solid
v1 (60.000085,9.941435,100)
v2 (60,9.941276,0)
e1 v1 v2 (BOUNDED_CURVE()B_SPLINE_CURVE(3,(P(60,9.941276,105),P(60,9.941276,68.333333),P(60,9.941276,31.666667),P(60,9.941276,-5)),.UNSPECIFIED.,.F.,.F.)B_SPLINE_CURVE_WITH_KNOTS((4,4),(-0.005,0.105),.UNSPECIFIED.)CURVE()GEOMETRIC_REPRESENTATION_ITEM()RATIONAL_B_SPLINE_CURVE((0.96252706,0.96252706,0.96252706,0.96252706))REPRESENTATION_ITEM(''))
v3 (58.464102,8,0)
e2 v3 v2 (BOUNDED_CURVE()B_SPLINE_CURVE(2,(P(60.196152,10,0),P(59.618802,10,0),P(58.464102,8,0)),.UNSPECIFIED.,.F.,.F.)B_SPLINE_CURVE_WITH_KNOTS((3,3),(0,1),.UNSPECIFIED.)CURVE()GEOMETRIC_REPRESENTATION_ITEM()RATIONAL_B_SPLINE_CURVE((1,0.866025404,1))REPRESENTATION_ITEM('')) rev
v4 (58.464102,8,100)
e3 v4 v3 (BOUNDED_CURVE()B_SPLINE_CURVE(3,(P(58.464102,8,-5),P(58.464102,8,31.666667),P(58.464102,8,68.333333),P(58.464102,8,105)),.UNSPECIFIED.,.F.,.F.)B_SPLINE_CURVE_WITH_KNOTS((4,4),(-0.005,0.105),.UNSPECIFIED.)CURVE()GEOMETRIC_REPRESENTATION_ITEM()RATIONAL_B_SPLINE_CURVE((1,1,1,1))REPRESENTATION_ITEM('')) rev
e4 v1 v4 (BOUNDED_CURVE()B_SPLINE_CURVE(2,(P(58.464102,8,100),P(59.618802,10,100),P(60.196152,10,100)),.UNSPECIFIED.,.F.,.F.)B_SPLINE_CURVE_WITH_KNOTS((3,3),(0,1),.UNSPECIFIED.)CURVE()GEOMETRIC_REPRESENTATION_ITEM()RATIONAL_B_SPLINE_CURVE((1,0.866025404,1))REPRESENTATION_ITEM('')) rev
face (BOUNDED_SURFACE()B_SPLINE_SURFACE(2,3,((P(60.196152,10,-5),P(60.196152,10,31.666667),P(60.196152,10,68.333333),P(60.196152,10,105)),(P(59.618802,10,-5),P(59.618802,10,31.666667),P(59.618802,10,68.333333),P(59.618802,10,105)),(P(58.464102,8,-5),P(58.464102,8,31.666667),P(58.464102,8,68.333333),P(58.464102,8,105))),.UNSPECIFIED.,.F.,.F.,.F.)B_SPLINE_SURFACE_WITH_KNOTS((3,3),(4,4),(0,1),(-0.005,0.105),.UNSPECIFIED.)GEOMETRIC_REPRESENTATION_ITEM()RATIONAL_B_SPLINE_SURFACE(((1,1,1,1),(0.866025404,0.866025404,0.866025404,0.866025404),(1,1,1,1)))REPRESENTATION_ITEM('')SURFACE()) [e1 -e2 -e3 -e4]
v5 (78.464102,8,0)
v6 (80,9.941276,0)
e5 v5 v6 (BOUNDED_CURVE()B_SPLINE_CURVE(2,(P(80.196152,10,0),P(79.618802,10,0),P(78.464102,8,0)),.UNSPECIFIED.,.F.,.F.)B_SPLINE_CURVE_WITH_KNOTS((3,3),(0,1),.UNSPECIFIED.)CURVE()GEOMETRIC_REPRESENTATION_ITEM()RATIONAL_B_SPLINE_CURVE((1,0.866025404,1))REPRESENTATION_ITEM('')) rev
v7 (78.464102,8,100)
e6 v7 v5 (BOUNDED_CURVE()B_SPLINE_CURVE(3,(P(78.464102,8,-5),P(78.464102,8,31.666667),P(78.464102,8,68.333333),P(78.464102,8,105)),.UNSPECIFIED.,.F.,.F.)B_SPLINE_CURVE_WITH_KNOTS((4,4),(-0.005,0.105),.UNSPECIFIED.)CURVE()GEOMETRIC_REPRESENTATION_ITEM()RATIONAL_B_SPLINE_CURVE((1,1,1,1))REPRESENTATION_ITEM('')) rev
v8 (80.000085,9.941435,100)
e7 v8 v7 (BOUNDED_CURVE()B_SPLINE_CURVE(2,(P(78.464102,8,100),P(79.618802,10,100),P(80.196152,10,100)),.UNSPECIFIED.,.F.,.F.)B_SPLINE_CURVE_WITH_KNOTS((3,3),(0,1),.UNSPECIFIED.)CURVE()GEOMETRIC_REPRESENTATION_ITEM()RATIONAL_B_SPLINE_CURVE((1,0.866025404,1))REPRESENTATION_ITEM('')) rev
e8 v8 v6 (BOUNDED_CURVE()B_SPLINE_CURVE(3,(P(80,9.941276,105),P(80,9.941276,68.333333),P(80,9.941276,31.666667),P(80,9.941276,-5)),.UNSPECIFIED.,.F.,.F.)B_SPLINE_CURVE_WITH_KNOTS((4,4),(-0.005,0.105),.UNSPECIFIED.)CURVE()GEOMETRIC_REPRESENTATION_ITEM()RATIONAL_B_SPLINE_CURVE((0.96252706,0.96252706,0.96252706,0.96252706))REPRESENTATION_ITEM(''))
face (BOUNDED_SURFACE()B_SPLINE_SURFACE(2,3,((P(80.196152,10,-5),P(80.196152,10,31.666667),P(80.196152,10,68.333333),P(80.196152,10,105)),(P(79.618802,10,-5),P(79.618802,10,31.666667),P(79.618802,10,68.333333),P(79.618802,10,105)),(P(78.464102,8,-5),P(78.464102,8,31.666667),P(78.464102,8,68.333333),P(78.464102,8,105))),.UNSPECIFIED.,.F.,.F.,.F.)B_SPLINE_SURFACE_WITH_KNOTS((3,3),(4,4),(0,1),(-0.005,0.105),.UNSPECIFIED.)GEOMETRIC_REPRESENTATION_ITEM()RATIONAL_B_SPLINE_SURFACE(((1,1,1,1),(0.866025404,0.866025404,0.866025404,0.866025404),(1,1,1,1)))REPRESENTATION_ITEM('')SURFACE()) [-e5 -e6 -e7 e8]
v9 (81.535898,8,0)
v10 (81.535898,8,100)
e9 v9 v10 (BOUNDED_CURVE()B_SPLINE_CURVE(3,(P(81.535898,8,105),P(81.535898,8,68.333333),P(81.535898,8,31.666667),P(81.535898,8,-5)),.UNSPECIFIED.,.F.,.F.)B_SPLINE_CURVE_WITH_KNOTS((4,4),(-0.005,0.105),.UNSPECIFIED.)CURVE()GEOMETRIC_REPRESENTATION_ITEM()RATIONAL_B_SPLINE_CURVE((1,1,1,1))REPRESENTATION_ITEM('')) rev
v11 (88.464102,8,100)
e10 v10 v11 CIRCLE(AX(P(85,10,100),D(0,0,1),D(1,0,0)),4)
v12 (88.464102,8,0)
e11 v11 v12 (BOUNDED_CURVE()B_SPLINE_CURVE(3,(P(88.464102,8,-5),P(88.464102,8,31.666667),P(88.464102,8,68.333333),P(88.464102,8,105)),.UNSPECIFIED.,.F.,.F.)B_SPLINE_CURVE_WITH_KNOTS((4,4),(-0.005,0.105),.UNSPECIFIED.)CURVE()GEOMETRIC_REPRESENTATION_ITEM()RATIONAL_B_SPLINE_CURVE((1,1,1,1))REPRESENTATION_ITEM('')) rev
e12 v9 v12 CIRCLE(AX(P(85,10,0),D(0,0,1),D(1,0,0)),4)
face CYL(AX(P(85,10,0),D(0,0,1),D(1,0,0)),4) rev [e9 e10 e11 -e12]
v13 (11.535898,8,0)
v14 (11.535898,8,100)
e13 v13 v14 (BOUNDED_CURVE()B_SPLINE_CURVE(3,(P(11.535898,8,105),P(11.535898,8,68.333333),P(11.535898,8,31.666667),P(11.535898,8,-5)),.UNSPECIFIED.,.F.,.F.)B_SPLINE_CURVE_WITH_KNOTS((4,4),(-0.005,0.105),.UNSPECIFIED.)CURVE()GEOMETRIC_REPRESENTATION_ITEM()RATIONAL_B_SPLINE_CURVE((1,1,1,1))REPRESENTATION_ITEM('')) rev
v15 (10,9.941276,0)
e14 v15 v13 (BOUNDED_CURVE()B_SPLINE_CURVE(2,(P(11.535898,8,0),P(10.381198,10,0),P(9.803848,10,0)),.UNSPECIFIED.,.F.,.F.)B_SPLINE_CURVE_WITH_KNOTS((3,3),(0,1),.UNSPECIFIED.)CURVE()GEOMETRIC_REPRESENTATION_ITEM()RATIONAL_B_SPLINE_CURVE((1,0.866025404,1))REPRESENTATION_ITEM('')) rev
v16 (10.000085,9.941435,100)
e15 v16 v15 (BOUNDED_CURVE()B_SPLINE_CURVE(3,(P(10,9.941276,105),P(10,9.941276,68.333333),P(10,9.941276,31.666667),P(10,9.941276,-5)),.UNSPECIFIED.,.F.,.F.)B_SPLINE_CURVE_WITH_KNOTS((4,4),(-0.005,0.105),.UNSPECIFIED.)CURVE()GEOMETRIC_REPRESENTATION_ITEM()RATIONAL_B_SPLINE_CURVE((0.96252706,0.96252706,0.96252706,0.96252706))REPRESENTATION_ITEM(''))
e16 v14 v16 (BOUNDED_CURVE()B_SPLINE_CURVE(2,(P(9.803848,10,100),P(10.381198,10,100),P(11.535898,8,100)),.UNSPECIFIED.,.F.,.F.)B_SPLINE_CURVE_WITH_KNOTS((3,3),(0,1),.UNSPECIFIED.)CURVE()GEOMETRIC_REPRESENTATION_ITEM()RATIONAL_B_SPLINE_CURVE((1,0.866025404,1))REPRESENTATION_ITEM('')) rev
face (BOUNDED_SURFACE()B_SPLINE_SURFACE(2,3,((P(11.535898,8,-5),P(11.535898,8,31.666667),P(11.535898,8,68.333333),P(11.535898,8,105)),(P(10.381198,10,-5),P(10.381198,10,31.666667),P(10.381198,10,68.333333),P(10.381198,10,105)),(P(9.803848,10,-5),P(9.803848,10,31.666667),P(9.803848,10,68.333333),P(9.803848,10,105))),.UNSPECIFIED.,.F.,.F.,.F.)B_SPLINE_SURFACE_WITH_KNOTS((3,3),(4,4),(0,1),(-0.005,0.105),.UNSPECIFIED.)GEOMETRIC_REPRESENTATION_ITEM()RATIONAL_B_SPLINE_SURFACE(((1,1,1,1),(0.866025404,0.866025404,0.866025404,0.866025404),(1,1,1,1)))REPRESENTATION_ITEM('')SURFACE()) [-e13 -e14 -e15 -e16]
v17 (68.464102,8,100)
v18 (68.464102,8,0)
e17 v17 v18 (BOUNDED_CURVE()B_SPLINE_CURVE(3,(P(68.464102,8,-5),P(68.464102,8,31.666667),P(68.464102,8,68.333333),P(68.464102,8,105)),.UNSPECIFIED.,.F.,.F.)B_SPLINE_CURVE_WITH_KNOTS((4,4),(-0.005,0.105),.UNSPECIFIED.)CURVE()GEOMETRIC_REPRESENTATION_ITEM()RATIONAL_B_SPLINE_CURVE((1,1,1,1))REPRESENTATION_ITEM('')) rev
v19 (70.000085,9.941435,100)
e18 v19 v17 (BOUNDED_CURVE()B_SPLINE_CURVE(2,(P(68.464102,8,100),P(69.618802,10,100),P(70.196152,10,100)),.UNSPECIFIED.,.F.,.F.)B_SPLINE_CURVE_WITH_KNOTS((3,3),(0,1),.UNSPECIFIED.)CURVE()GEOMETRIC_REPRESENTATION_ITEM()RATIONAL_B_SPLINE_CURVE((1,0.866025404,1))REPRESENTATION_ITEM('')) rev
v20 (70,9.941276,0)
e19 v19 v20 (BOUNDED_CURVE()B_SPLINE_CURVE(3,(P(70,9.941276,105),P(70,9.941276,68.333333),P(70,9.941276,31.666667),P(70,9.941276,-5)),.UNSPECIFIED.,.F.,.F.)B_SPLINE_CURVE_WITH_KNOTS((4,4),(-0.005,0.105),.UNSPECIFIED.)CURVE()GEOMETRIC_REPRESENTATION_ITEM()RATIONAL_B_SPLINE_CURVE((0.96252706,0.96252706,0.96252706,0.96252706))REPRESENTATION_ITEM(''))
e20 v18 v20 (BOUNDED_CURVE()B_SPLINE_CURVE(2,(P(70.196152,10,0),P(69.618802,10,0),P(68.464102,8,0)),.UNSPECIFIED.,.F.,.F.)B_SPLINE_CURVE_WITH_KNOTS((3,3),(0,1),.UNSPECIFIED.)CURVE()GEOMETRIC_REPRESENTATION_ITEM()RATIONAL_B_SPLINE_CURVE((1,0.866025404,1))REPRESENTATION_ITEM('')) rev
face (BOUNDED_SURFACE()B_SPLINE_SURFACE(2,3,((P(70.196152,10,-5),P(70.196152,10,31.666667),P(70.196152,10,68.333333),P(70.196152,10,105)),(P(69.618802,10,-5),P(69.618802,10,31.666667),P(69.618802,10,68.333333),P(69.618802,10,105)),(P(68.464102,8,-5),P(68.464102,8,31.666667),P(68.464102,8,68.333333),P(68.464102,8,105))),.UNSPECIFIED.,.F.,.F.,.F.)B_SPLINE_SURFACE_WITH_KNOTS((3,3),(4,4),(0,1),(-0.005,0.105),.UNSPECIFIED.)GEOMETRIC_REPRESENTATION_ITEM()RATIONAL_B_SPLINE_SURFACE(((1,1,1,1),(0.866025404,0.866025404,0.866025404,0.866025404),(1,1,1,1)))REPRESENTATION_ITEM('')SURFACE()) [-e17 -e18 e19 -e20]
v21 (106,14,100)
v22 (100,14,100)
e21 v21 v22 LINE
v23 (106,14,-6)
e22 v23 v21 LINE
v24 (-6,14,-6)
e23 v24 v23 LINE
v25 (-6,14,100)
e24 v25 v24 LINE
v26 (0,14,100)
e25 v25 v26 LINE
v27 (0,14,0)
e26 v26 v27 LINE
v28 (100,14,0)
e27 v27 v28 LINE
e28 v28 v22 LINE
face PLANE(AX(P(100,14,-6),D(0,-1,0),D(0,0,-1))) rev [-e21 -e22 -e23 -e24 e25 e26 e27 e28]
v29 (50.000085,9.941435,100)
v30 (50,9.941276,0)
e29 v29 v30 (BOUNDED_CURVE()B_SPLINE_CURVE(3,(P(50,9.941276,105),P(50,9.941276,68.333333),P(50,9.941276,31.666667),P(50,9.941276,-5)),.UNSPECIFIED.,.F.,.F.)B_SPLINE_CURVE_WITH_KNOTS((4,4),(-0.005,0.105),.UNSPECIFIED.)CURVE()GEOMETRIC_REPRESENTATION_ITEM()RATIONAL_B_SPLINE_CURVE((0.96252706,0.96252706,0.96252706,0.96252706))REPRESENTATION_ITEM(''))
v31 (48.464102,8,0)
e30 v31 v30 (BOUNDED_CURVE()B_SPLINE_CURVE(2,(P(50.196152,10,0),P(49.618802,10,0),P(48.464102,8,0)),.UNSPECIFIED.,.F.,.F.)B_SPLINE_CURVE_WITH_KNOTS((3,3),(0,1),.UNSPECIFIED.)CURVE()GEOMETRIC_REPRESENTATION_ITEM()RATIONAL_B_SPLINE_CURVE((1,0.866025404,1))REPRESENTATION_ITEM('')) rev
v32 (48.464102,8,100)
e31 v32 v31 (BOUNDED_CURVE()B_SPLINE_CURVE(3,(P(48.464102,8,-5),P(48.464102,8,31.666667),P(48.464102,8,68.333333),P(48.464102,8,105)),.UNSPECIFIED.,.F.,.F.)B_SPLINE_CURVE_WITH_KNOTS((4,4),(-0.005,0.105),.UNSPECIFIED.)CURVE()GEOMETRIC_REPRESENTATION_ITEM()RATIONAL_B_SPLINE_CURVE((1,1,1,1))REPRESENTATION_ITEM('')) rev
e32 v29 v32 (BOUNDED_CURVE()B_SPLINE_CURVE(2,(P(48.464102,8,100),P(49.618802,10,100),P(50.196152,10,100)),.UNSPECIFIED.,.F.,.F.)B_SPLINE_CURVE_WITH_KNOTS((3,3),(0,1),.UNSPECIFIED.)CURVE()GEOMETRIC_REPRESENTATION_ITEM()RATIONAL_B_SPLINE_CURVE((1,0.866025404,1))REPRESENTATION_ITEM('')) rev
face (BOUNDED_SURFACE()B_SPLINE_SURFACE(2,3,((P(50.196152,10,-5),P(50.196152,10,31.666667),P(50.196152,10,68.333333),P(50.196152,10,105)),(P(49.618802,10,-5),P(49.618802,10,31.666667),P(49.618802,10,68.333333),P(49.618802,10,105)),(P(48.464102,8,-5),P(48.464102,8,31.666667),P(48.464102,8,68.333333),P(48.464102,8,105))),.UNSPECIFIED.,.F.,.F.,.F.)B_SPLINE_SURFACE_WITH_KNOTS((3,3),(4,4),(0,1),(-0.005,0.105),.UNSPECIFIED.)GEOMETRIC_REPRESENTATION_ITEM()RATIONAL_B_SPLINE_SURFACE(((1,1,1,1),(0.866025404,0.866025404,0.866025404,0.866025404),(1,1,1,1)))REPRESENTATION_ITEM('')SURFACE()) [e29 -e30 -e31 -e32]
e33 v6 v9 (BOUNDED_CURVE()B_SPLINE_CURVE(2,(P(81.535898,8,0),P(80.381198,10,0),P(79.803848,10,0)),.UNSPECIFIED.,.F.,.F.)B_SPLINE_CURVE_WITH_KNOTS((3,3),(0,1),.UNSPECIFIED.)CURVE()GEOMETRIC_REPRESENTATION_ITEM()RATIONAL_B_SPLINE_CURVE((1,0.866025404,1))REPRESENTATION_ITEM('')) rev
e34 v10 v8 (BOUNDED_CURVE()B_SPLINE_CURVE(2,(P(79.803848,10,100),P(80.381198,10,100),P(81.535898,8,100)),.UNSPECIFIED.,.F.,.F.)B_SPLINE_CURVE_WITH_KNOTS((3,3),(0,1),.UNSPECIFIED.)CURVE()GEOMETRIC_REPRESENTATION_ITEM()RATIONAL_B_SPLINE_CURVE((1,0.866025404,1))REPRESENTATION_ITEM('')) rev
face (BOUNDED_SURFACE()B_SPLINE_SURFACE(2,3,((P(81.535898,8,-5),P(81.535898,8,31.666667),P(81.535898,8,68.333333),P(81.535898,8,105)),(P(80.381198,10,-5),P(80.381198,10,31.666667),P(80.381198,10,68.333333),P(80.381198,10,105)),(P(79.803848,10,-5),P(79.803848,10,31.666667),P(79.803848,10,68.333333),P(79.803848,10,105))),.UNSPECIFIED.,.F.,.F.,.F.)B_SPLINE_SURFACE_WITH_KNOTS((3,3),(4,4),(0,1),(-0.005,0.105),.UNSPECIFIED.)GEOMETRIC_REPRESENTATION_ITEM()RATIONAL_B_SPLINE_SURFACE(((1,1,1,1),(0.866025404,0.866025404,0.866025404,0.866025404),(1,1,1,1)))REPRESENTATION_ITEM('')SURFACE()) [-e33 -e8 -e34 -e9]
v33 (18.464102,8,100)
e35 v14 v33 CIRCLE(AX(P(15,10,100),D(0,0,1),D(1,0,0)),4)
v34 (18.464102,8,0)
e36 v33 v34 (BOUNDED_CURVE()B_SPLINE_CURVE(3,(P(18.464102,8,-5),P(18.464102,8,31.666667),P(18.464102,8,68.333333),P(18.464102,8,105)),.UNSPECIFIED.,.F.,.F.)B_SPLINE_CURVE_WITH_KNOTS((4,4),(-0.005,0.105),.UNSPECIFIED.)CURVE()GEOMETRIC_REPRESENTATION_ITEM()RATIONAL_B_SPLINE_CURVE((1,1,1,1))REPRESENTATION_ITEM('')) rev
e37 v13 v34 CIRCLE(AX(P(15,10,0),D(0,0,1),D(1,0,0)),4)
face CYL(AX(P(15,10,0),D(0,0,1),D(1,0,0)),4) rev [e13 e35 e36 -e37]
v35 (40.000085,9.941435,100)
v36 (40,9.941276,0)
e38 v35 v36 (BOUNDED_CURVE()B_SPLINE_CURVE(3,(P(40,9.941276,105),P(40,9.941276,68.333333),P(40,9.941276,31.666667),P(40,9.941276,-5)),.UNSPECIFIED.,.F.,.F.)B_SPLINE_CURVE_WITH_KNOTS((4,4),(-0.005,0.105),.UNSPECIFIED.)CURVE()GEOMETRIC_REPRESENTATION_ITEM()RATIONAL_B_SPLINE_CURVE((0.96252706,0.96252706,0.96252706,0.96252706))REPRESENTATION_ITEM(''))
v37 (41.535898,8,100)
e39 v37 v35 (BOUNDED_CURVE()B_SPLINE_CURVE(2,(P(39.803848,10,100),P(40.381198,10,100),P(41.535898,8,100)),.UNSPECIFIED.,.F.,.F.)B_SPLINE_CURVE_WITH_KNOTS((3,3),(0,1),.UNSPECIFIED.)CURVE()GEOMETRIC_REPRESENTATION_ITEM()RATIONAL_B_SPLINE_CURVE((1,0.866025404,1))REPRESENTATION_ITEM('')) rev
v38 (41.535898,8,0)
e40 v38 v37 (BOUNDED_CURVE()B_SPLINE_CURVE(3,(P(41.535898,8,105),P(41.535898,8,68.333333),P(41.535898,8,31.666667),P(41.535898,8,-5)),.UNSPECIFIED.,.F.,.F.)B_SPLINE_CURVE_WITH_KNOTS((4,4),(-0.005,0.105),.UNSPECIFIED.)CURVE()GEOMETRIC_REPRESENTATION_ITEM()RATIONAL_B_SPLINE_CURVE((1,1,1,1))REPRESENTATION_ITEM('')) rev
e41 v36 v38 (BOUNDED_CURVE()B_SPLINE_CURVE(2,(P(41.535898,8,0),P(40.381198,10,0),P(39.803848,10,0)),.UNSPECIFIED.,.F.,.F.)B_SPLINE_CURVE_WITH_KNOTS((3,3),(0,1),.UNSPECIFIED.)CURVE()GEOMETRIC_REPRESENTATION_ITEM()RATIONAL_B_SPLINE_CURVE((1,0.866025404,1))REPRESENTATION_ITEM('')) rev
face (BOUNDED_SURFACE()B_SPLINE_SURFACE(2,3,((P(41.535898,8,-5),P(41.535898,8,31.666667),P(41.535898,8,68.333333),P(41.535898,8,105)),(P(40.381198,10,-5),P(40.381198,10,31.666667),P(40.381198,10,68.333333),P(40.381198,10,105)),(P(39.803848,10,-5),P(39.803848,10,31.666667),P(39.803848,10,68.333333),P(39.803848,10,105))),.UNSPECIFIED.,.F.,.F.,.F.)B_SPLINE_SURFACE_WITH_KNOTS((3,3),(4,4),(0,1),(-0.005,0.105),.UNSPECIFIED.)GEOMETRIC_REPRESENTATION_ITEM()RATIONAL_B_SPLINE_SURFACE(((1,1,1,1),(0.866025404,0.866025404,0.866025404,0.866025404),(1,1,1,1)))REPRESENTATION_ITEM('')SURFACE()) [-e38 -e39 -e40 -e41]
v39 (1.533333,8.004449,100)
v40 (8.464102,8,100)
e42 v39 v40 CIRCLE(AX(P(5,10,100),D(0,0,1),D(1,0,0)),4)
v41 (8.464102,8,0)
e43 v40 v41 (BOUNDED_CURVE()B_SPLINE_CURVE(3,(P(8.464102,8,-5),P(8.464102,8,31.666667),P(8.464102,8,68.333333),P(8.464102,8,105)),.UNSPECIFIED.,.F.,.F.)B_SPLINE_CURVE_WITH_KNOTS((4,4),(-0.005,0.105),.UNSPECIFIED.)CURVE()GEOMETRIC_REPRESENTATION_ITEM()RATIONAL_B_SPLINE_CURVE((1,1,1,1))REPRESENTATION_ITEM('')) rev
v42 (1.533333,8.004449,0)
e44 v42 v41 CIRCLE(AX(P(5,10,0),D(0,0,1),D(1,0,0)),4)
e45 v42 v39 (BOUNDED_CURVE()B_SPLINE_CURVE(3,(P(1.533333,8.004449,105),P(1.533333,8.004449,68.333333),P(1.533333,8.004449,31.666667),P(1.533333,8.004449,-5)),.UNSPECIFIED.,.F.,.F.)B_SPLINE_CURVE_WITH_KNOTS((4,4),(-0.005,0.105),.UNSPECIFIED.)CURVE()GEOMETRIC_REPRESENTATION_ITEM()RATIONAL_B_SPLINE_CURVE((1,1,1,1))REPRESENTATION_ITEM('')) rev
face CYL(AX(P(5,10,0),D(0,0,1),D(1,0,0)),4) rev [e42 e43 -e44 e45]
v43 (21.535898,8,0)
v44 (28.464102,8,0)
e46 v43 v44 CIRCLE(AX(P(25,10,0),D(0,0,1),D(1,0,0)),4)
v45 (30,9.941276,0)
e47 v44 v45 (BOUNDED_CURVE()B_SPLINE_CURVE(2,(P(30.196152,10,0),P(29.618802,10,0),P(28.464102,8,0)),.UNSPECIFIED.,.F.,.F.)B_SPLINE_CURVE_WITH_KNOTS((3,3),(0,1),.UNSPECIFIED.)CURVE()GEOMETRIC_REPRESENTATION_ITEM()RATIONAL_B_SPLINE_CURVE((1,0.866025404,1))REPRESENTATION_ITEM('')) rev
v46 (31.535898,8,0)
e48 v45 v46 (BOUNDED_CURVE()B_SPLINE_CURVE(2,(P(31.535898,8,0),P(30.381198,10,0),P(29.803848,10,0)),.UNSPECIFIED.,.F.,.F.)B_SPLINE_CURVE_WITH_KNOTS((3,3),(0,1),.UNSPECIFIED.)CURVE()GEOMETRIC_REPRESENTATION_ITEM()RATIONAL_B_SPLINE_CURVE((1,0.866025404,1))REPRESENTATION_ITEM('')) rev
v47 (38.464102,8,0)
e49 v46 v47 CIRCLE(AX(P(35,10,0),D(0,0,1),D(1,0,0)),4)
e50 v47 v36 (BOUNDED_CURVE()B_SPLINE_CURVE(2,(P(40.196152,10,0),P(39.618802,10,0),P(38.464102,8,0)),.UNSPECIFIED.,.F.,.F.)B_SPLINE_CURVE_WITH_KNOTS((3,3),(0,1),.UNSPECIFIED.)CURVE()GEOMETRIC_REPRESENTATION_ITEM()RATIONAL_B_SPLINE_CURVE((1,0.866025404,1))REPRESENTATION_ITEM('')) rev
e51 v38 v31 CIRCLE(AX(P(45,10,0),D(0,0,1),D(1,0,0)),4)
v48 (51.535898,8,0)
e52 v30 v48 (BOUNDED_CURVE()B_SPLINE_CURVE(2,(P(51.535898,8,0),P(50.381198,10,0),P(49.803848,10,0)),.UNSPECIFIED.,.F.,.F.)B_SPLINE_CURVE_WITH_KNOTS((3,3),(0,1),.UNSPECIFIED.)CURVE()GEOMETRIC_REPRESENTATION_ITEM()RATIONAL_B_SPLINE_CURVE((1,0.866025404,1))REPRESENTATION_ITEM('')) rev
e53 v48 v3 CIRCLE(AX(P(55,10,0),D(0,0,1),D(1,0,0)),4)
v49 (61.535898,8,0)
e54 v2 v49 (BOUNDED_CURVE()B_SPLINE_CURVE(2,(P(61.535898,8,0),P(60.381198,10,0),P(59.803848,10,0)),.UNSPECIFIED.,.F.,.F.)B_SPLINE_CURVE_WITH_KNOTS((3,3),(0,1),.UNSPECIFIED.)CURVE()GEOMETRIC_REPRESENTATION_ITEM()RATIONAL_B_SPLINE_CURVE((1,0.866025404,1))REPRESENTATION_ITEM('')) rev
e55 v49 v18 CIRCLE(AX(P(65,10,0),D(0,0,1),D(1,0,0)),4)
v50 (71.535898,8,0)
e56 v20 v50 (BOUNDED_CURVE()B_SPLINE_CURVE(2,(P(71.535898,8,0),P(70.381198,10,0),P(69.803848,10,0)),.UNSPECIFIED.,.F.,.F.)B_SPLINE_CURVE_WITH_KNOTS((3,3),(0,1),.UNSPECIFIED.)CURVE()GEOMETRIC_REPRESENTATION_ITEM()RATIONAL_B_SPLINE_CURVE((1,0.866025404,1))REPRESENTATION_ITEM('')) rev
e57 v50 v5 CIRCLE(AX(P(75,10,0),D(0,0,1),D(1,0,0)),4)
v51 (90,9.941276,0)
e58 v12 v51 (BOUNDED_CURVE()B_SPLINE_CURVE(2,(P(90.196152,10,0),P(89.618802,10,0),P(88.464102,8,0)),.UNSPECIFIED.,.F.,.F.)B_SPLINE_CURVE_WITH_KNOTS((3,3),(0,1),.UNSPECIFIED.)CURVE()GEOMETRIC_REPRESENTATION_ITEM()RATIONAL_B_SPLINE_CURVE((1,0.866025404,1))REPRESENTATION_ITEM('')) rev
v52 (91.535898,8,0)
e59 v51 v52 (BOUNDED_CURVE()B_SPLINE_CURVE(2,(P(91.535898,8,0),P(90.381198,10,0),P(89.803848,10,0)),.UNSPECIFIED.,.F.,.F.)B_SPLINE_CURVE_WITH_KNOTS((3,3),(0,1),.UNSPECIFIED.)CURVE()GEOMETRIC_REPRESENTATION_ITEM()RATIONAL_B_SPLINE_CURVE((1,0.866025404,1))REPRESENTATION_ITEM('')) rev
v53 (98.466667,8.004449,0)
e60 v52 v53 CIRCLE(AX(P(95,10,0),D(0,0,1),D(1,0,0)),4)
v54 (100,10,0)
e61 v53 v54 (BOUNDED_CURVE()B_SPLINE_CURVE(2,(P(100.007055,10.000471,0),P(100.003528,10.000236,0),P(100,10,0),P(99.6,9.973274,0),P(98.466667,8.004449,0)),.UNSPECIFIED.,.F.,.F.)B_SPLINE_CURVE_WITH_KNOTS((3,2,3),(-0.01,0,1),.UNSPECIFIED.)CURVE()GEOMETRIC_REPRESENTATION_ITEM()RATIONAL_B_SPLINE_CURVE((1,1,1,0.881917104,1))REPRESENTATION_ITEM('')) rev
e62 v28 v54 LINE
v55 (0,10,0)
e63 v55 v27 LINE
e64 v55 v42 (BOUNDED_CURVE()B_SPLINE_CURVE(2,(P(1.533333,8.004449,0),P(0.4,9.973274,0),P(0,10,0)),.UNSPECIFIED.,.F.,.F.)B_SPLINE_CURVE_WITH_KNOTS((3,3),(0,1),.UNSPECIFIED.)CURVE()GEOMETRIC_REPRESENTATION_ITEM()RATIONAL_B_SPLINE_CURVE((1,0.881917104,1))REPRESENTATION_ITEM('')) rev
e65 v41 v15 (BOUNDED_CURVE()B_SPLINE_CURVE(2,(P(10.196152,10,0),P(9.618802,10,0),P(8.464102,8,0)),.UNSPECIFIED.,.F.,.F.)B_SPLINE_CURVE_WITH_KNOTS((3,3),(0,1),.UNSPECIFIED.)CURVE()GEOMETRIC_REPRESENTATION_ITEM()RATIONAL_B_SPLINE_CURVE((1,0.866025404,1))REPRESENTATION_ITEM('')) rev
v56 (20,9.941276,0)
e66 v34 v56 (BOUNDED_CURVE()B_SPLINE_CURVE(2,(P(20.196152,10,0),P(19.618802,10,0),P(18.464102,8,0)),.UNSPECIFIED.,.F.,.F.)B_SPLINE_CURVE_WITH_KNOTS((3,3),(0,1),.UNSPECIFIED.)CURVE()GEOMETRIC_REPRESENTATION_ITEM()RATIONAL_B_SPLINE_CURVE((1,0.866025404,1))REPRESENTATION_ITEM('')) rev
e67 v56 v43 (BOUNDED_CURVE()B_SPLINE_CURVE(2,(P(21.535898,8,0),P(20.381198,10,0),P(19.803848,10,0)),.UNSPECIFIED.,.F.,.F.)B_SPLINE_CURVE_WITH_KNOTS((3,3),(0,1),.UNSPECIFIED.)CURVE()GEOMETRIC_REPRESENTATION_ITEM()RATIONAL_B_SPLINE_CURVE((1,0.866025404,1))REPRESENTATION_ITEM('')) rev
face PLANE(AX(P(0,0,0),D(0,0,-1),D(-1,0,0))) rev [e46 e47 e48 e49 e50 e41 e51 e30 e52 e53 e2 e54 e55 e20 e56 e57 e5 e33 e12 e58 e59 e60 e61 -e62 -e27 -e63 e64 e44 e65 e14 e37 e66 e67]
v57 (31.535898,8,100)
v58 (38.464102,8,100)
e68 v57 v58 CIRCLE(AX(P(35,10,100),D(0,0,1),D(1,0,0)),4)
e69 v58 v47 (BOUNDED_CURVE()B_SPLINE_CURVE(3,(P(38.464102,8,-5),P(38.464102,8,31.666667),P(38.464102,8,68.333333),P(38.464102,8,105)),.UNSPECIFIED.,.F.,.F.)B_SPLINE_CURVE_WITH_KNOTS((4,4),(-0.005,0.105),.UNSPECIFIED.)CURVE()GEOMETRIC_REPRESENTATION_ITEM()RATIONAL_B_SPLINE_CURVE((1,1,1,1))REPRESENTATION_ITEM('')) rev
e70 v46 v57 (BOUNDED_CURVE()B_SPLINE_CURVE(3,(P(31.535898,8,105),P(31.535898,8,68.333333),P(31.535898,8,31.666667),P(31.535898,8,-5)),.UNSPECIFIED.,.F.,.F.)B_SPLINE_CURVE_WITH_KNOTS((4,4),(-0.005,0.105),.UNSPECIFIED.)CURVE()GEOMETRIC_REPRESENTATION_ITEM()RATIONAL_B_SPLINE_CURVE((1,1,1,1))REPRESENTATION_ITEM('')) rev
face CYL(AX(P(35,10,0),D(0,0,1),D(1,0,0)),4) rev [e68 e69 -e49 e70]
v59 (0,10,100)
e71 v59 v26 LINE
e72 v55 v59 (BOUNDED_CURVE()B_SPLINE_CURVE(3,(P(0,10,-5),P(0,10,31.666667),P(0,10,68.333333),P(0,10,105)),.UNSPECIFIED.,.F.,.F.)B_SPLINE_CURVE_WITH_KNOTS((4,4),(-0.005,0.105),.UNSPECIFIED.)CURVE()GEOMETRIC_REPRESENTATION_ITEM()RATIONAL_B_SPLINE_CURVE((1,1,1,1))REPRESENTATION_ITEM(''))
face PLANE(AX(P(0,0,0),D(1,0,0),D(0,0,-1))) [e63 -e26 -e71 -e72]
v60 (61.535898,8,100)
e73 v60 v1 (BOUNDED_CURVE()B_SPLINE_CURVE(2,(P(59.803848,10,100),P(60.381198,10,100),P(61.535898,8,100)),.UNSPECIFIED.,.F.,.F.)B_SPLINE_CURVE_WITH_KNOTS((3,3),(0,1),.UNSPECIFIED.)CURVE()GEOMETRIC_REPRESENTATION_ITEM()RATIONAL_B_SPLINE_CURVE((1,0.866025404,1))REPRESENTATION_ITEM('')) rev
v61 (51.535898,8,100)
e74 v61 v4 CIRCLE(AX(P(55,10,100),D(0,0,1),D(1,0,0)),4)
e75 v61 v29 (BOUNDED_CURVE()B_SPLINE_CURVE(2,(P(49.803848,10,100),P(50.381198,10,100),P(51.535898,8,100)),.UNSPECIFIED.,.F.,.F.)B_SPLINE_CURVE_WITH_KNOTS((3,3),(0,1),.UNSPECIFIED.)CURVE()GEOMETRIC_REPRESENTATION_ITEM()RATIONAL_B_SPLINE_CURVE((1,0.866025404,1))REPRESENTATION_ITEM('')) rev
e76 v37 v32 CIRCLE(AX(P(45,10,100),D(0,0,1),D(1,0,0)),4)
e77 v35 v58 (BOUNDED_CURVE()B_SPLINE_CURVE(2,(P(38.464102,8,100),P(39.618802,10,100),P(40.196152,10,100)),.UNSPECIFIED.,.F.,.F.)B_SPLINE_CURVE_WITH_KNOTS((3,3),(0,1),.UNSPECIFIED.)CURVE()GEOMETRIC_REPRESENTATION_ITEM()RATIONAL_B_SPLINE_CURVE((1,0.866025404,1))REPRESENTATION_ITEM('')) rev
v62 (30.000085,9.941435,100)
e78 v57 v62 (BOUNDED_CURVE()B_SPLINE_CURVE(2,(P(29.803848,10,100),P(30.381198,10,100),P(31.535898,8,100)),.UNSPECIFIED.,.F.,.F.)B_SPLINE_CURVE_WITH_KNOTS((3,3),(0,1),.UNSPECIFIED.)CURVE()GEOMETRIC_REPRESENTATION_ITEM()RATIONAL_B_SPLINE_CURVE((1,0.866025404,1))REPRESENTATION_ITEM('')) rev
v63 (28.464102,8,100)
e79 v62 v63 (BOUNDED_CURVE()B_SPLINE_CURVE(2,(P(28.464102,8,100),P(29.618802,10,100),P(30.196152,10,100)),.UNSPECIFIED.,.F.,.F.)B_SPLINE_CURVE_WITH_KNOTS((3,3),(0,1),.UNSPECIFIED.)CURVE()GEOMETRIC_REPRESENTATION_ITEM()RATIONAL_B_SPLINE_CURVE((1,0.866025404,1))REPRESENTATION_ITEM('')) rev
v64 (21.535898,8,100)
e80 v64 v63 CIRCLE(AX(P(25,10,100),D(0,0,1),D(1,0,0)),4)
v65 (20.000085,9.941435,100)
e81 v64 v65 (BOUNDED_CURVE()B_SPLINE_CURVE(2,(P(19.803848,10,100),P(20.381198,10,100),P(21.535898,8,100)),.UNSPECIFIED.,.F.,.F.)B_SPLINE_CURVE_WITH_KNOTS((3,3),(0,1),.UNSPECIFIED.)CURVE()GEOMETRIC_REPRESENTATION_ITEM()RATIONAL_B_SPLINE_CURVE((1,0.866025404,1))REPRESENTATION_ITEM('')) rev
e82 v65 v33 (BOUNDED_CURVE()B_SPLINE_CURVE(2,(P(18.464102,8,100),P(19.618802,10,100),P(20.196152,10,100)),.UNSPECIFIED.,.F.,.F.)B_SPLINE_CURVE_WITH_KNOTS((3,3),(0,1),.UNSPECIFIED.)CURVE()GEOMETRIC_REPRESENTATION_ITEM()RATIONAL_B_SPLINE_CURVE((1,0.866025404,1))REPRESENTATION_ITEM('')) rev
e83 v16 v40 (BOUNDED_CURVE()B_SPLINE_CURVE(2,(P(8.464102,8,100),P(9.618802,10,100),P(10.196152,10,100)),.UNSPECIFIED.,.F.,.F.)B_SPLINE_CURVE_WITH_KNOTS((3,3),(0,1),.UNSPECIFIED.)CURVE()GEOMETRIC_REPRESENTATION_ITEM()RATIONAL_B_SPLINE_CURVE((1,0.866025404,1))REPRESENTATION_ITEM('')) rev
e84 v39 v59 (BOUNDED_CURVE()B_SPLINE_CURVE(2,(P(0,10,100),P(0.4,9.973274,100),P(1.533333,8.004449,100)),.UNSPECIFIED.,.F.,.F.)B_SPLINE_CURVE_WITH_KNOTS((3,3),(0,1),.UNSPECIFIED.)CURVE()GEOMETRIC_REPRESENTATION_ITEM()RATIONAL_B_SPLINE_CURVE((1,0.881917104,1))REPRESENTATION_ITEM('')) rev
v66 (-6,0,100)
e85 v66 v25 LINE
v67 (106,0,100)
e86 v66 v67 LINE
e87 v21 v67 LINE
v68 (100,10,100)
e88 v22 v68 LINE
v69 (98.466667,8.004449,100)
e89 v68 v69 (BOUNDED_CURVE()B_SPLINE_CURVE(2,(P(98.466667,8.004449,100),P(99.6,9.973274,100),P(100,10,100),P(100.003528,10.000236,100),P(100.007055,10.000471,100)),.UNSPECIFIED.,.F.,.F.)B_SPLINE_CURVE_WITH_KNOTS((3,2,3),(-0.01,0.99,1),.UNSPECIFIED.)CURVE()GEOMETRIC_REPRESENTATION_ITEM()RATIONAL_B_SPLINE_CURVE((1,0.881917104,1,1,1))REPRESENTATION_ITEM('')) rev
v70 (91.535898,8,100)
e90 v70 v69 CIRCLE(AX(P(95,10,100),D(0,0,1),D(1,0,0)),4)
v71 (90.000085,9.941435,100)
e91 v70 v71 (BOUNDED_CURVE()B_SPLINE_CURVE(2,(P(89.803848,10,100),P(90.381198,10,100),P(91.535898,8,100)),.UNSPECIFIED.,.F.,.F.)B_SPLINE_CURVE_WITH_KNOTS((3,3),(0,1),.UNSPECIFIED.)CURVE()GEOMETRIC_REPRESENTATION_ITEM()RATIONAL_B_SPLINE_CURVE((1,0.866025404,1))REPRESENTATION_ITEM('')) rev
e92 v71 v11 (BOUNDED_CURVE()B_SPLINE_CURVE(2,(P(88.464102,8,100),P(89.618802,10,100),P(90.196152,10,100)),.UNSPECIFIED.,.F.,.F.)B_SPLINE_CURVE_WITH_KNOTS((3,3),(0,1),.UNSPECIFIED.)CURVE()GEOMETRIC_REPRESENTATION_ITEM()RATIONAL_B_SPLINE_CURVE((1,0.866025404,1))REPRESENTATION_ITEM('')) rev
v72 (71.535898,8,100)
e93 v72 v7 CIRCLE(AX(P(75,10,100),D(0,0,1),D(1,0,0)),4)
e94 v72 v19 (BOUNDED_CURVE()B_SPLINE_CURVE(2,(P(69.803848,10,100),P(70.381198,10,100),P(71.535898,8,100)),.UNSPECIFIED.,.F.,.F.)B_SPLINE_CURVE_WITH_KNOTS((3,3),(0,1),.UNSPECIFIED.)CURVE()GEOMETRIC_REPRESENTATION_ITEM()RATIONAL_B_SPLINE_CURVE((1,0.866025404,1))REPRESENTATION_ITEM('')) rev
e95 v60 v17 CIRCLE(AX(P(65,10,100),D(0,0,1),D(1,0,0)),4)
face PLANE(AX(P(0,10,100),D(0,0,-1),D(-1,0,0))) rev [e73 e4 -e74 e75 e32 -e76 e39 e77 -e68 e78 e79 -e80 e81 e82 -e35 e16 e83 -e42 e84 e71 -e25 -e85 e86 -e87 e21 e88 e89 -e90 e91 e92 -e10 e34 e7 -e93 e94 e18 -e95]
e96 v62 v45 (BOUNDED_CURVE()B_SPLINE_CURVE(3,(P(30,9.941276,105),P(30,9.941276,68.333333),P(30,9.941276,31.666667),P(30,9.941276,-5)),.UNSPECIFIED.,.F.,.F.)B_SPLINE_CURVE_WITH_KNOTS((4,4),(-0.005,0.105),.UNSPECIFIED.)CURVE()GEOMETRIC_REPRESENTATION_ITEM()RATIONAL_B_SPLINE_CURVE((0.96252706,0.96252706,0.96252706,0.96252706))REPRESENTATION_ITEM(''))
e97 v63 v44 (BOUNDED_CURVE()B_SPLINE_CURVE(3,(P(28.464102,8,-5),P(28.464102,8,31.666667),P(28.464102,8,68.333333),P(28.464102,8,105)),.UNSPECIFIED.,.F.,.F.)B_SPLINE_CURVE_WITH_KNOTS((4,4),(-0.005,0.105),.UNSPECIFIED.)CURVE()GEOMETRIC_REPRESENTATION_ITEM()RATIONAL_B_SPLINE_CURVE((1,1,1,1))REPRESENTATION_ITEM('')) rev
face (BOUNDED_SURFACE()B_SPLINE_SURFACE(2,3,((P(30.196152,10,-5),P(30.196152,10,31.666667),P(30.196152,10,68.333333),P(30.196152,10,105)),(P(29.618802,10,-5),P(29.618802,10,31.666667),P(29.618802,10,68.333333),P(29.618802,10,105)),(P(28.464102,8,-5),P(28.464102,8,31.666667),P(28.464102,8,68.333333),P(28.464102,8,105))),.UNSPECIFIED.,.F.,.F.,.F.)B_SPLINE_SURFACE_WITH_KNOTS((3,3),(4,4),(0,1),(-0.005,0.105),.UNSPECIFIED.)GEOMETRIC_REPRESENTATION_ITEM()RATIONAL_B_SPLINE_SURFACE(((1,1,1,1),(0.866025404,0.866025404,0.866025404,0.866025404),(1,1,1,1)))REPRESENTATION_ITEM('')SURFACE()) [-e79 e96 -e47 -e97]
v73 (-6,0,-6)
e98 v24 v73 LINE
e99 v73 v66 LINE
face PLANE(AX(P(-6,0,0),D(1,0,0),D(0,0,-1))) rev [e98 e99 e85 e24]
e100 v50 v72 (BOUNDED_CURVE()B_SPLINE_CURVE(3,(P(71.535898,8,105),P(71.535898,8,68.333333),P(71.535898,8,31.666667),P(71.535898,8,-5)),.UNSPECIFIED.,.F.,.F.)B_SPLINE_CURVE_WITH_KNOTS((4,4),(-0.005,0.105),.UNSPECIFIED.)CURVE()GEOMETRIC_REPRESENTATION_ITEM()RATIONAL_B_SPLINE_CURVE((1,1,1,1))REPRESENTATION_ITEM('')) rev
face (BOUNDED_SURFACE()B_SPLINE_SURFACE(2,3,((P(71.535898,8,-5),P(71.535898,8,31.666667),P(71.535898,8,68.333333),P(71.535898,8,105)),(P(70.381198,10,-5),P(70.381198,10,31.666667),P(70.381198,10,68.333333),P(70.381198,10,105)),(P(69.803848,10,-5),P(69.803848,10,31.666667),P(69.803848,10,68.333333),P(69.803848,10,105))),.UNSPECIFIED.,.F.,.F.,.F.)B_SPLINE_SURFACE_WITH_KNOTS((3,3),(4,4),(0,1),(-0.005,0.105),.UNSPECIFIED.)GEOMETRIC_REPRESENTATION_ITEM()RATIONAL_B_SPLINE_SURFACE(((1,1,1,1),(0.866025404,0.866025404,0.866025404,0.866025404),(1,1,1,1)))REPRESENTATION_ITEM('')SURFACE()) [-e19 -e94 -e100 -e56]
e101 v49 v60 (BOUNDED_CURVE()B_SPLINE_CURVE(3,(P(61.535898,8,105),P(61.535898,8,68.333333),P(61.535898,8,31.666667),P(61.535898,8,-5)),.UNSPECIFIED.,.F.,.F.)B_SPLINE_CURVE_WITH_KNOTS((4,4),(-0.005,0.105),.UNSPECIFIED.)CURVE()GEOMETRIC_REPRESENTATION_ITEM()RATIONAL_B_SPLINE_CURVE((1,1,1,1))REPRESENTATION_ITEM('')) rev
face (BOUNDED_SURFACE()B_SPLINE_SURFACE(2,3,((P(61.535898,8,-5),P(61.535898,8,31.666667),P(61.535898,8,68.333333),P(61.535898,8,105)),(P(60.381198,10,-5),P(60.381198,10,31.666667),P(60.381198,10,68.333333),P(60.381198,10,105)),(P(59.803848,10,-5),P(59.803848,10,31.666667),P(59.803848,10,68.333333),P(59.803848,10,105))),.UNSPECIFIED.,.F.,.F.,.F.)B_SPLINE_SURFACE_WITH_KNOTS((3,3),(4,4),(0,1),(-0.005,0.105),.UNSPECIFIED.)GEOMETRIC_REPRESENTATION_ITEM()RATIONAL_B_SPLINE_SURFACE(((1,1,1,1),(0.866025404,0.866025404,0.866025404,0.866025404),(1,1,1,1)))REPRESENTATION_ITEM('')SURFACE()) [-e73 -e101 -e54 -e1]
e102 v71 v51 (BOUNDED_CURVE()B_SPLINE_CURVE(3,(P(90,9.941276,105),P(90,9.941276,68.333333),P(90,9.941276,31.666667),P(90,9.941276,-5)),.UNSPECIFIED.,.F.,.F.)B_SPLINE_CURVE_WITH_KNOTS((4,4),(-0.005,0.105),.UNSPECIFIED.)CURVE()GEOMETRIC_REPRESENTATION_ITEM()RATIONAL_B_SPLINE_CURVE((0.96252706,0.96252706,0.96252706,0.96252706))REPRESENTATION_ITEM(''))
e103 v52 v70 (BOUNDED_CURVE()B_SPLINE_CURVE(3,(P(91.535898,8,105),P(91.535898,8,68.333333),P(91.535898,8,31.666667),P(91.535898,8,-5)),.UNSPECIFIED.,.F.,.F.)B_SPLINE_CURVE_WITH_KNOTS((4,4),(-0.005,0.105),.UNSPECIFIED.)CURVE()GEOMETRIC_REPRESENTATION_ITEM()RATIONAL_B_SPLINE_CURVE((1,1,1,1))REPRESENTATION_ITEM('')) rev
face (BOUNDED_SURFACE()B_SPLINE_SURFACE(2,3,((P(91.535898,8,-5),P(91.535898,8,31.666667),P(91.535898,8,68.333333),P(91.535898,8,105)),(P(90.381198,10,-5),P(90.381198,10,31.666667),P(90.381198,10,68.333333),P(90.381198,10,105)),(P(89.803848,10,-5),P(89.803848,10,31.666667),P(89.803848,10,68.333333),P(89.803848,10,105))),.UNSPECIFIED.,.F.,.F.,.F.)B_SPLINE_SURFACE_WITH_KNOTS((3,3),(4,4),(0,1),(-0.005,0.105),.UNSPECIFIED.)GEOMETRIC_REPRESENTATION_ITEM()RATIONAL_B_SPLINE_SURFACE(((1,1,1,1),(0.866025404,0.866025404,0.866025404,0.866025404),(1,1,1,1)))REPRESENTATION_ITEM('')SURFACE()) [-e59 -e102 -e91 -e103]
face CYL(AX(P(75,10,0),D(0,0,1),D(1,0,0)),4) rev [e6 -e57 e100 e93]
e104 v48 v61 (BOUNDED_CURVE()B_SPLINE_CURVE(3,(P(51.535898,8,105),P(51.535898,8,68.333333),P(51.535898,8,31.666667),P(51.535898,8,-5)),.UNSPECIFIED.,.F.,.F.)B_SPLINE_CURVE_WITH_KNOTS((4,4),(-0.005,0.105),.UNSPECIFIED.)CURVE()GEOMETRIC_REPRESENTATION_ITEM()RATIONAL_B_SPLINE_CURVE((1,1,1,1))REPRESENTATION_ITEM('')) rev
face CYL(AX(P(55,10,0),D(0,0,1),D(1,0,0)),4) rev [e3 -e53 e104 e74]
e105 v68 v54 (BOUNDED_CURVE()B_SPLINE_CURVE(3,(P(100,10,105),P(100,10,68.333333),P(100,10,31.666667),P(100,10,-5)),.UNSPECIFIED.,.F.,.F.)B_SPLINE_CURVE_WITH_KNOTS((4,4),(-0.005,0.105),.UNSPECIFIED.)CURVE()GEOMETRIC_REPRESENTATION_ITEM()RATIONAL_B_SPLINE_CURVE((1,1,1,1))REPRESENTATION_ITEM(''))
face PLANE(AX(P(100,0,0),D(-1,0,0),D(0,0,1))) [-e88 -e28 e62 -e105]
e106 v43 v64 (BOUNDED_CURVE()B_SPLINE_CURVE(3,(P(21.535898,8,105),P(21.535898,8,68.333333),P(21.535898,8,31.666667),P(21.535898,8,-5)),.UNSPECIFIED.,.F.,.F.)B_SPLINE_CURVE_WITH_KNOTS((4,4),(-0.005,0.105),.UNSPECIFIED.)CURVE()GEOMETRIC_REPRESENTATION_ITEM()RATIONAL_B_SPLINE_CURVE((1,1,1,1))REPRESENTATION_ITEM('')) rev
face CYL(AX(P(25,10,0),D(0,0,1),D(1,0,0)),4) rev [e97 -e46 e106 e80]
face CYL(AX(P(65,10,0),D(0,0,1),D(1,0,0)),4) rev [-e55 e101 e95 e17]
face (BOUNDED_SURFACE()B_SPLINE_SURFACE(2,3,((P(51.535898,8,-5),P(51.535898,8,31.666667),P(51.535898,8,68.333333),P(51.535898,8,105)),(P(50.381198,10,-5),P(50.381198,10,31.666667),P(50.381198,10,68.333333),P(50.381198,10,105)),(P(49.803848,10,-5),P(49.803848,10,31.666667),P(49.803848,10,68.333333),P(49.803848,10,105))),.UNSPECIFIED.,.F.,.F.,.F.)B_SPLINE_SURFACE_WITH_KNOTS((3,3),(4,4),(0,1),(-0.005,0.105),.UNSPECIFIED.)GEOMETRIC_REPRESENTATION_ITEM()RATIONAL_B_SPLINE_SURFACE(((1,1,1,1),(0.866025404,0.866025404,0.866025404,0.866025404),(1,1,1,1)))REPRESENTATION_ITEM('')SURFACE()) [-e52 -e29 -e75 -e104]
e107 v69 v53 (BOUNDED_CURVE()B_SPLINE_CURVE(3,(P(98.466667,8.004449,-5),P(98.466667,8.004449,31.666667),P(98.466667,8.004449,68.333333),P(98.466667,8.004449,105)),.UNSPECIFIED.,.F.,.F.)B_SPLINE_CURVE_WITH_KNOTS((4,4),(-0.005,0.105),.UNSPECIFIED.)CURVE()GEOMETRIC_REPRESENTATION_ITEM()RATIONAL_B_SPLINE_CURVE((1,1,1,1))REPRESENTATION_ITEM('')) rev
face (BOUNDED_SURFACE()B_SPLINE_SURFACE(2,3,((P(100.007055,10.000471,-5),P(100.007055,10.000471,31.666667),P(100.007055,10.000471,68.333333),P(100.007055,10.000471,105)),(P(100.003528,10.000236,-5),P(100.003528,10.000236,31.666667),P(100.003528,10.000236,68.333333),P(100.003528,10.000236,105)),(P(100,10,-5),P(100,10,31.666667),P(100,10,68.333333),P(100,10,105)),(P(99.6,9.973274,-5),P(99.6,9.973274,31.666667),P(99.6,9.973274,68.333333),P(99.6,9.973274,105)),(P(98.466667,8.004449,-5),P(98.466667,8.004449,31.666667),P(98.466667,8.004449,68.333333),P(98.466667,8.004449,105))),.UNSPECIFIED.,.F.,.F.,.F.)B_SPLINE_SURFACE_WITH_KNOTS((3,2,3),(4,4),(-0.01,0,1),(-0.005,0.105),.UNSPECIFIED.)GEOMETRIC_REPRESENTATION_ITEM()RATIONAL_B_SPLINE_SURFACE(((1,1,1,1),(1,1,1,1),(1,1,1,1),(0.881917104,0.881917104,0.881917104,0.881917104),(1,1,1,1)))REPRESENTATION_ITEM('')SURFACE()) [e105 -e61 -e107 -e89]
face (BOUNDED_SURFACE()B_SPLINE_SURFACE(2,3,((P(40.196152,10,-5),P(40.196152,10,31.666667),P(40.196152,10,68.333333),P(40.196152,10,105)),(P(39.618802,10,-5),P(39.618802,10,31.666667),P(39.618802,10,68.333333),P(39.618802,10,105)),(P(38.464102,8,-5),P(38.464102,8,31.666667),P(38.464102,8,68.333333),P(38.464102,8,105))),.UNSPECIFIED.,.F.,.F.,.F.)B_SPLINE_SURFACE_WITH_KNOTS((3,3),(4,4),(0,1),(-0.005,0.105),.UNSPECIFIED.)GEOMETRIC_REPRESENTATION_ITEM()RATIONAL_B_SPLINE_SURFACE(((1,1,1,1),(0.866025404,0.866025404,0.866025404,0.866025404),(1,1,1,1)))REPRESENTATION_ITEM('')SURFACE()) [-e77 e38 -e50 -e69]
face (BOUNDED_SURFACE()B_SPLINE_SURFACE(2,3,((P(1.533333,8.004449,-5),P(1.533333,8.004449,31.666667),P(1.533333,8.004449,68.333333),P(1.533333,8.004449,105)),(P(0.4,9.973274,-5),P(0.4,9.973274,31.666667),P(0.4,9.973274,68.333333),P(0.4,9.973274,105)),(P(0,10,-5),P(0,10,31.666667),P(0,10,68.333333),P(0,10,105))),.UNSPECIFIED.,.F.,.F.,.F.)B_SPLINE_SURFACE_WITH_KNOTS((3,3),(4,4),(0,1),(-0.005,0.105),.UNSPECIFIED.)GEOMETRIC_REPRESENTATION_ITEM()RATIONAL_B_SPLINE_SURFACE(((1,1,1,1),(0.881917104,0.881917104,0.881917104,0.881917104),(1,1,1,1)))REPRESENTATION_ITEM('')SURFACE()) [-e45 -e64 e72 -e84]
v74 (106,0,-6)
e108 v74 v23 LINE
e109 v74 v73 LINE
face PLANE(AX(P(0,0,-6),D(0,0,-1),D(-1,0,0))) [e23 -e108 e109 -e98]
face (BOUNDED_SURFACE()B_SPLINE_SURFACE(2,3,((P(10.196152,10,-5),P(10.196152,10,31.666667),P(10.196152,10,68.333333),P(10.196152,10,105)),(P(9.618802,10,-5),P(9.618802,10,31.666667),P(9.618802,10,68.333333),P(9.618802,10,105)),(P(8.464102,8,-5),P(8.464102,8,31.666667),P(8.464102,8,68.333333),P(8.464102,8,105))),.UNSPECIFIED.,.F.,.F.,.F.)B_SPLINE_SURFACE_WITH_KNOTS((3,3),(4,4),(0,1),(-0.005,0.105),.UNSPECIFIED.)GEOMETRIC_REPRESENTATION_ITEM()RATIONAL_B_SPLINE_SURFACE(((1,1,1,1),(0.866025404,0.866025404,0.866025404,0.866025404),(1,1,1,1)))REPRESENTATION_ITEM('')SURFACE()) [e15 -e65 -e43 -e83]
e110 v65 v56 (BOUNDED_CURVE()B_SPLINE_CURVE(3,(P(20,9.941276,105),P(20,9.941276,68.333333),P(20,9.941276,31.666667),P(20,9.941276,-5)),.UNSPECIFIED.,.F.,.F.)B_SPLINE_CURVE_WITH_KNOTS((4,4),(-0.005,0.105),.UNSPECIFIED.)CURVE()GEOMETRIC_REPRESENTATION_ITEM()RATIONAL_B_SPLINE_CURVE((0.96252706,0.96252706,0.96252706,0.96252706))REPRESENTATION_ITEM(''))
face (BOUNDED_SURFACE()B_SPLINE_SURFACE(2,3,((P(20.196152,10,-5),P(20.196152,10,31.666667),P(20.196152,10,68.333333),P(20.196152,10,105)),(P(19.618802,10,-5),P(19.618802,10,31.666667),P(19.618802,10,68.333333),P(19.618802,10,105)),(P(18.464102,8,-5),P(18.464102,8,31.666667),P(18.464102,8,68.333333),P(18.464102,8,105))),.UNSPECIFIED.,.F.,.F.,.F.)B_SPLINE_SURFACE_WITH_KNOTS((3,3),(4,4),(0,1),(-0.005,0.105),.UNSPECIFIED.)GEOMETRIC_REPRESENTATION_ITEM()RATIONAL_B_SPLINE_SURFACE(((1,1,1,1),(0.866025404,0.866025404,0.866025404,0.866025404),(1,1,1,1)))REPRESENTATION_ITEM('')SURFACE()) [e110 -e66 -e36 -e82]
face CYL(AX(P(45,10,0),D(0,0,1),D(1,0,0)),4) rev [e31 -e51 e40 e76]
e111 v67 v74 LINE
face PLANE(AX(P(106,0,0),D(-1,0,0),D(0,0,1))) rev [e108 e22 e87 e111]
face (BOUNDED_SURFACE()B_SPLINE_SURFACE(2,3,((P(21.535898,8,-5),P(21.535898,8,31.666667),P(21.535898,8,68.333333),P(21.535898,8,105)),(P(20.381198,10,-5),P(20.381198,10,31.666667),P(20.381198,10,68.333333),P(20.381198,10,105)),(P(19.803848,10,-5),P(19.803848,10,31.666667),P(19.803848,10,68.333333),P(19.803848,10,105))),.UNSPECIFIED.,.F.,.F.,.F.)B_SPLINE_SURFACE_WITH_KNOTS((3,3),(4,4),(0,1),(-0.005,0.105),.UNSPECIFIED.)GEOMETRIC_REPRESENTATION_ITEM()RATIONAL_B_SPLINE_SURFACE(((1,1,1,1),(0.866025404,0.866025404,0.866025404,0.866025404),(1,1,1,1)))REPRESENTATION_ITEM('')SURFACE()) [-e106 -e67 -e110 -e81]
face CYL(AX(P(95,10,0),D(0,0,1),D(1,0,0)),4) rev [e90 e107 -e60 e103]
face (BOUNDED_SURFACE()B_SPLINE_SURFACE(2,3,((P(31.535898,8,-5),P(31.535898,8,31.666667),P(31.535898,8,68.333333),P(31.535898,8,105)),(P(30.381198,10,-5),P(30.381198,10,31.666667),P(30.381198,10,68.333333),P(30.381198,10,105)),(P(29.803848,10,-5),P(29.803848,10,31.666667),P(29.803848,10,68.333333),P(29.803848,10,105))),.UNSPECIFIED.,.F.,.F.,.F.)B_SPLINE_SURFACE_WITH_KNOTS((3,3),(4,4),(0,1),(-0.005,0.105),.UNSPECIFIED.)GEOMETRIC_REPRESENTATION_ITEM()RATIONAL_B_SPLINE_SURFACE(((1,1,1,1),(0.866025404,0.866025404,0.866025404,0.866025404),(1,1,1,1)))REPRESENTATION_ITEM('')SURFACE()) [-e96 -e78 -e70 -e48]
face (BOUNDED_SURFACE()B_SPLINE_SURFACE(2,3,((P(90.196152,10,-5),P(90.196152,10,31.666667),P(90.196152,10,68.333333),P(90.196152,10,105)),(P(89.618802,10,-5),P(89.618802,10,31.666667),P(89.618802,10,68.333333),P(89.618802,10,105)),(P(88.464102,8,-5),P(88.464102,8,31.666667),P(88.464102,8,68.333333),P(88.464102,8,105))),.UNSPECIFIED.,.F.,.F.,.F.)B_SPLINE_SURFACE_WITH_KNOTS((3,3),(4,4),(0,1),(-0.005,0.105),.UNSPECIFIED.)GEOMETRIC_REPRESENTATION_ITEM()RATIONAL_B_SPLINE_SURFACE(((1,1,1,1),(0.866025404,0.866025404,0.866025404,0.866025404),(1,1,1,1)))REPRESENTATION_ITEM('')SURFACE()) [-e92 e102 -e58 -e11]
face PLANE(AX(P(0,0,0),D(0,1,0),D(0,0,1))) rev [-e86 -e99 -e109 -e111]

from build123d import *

# Parameters (mm, degrees)
SKETCH1_W           = 100
SKETCH1_H           = 100
BOSS_EXTRUDE1_DEPTH = 10
SKETCH2_W           = 100
SKETCH2_H           = 14
BOSS_EXTRUDE2_DEPTH = 6
SKETCH3_R           = 4
CUT_EXTRUDE1_DEPTH  = 100
FILLET1_DEPTH       = 101
SKETCH4_W           = 106
SKETCH4_H           = 14
BOSS_EXTRUDE3_DEPTH = 6
SKETCH5_W           = 106
SKETCH5_H           = 14
BOSS_EXTRUDE4_DEPTH = 6


with BuildPart() as part:
    # Sketch1 → Boss-Extrude1 (new body)
    with BuildSketch(Plane(origin=(0, 0, 0), x_dir=(1, 0, 0), z_dir=(0, 1, 0))):
        with Locations((50, -50)):
            Rectangle(SKETCH1_W, SKETCH1_H)
    extrude(amount=BOSS_EXTRUDE1_DEPTH)

    # Sketch2 → Boss-Extrude2 (add)
    with BuildSketch(Plane(origin=(0, 0, 0), x_dir=(-1, 0, 0), z_dir=(0, 0, -1))):
        with Locations((-50, 7)):
            Rectangle(SKETCH2_W, SKETCH2_H)
    extrude(amount=BOSS_EXTRUDE2_DEPTH)

    # Sketch3 → Cut-Extrude1 (cut)
    with BuildSketch(Plane.XY.offset(100)):
        with Locations((5, 10)):
            Circle(SKETCH3_R)
        with Locations((15, 10)):
            Circle(SKETCH3_R)
        with Locations((25, 10)):
            Circle(SKETCH3_R)
        with Locations((35, 10)):
            Circle(SKETCH3_R)
        with Locations((45, 10)):
            Circle(SKETCH3_R)
        with Locations((55, 10)):
            Circle(SKETCH3_R)
        with Locations((65, 10)):
            Circle(SKETCH3_R)
        with Locations((75, 10)):
            Circle(SKETCH3_R)
        with Locations((85, 10)):
            Circle(SKETCH3_R)
        with Locations((95, 10)):
            Circle(SKETCH3_R)
    extrude(amount=-CUT_EXTRUDE1_DEPTH, mode=Mode.SUBTRACT)

    # Fillet1: read off the stored shape, not the designer's step
    # Fillet1 outline → Fillet1 (cut)
    with BuildSketch(Plane.XY):
        with BuildLine():
            add(Edge.make_bspline(
                [(1.533333333, 8.004449394), (0.4, 9.973273876), (0, 10)],
                knots=[0, 0, 0, 1, 1, 1], degree=2, weights=[1, 0.881917104, 1]))
            ThreePointArc((1.533333333, 8.004449394), (1.135632868, 8.967204441), (1, 10))
            Line((1, 10), (0, 10))
        make_face()
        with BuildLine():
            add(Edge.make_bspline(
                [(11.535898385, 8), (10.599666447, 9.621601285), (9.99999988, 9.941275628)],
                knots=[0, 0, 0, 0.831887243, 0.831887243, 0.831887243], degree=2, weights=[1, 0.888548242, 0.962527076]))
            ThreePointArc((11.535898385, 8), (11.136296695, 8.96472382), (11, 10))
            Line((11, 10), (9, 10))
            ThreePointArc((9, 10), (8.863703305, 8.96472382), (8.464101615, 8))
            add(Edge.make_bspline(
                [(9.99999988, 9.941275628), (9.400396177, 9.621709752), (8.464101615, 8)],
                knots=[0.168063315, 0.168063315, 0.168063315, 1, 1, 1], degree=2, weights=[0.96253587, 0.888541618, 1]))
        make_face()
        with BuildLine():
            add(Edge.make_bspline(
                [(21.535898385, 8), (20.599666447, 9.621601285), (19.99999988, 9.941275628)],
                knots=[0, 0, 0, 0.831887243, 0.831887243, 0.831887243], degree=2, weights=[1, 0.888548242, 0.962527076]))
            ThreePointArc((21.535898385, 8), (21.136296695, 8.96472382), (21, 10))
            Line((21, 10), (19, 10))
            ThreePointArc((19, 10), (18.863703305, 8.96472382), (18.464101615, 8))
            add(Edge.make_bspline(
                [(19.99999988, 9.941275628), (19.400396177, 9.621709752), (18.464101615, 8)],
                knots=[0.168063315, 0.168063315, 0.168063315, 1, 1, 1], degree=2, weights=[0.96253587, 0.888541618, 1]))
        make_face()
        with BuildLine():
            add(Edge.make_bspline(
                [(31.535898385, 8), (30.599666447, 9.621601285), (29.99999988, 9.941275628)],
                knots=[0, 0, 0, 0.831887243, 0.831887243, 0.831887243], degree=2, weights=[1, 0.888548242, 0.962527076]))
            ThreePointArc((31.535898385, 8), (31.136296695, 8.96472382), (31, 10))
            Line((31, 10), (29, 10))
            ThreePointArc((29, 10), (28.863703305, 8.96472382), (28.464101615, 8))
            add(Edge.make_bspline(
                [(29.99999988, 9.941275628), (29.400396177, 9.621709752), (28.464101615, 8)],
                knots=[0.168063315, 0.168063315, 0.168063315, 1, 1, 1], degree=2, weights=[0.96253587, 0.888541618, 1]))
        make_face()
        with BuildLine():
            add(Edge.make_bspline(
                [(41.535898385, 8), (40.599666447, 9.621601285), (39.99999988, 9.941275628)],
                knots=[0, 0, 0, 0.831887243, 0.831887243, 0.831887243], degree=2, weights=[1, 0.888548242, 0.962527076]))
            ThreePointArc((41.535898385, 8), (41.136296695, 8.96472382), (41, 10))
            Line((41, 10), (39, 10))
            ThreePointArc((39, 10), (38.863703305, 8.96472382), (38.464101615, 8))
            add(Edge.make_bspline(
                [(39.99999988, 9.941275628), (39.400396177, 9.621709752), (38.464101615, 8)],
                knots=[0.168063315, 0.168063315, 0.168063315, 1, 1, 1], degree=2, weights=[0.96253587, 0.888541618, 1]))
        make_face()
        with BuildLine():
            add(Edge.make_bspline(
                [(51.535898385, 8), (50.599666447, 9.621601285), (49.99999988, 9.941275628)],
                knots=[0, 0, 0, 0.831887243, 0.831887243, 0.831887243], degree=2, weights=[1, 0.888548242, 0.962527076]))
            ThreePointArc((51.535898385, 8), (51.136296695, 8.96472382), (51, 10))
            Line((51, 10), (49, 10))
            ThreePointArc((49, 10), (48.863703305, 8.96472382), (48.464101615, 8))
            add(Edge.make_bspline(
                [(49.99999988, 9.941275628), (49.400396177, 9.621709752), (48.464101615, 8)],
                knots=[0.168063315, 0.168063315, 0.168063315, 1, 1, 1], degree=2, weights=[0.96253587, 0.888541618, 1]))
        make_face()
        with BuildLine():
            add(Edge.make_bspline(
                [(61.535898385, 8), (60.599666447, 9.621601285), (59.99999988, 9.941275628)],
                knots=[0, 0, 0, 0.831887243, 0.831887243, 0.831887243], degree=2, weights=[1, 0.888548242, 0.962527076]))
            ThreePointArc((61.535898385, 8), (61.136296695, 8.96472382), (61, 10))
            Line((61, 10), (59, 10))
            ThreePointArc((59, 10), (58.863703305, 8.96472382), (58.464101615, 8))
            add(Edge.make_bspline(
                [(59.99999988, 9.941275628), (59.400396177, 9.621709752), (58.464101615, 8)],
                knots=[0.168063315, 0.168063315, 0.168063315, 1, 1, 1], degree=2, weights=[0.96253587, 0.888541618, 1]))
        make_face()
        with BuildLine():
            add(Edge.make_bspline(
                [(71.535898385, 8), (70.599666447, 9.621601285), (69.99999988, 9.941275628)],
                knots=[0, 0, 0, 0.831887243, 0.831887243, 0.831887243], degree=2, weights=[1, 0.888548242, 0.962527076]))
            ThreePointArc((71.535898385, 8), (71.136296695, 8.96472382), (71, 10))
            Line((71, 10), (69, 10))
            ThreePointArc((69, 10), (68.863703305, 8.96472382), (68.464101615, 8))
            add(Edge.make_bspline(
                [(69.99999988, 9.941275628), (69.400396177, 9.621709752), (68.464101615, 8)],
                knots=[0.168063315, 0.168063315, 0.168063315, 1, 1, 1], degree=2, weights=[0.96253587, 0.888541618, 1]))
        make_face()
        with BuildLine():
            add(Edge.make_bspline(
                [(81.535898385, 8), (80.599666447, 9.621601285), (79.99999988, 9.941275628)],
                knots=[0, 0, 0, 0.831887243, 0.831887243, 0.831887243], degree=2, weights=[1, 0.888548242, 0.962527076]))
            ThreePointArc((81.535898385, 8), (81.136296695, 8.96472382), (81, 10))
            Line((81, 10), (79, 10))
            ThreePointArc((79, 10), (78.863703305, 8.96472382), (78.464101615, 8))
            add(Edge.make_bspline(
                [(79.99999988, 9.941275628), (79.400396177, 9.621709752), (78.464101615, 8)],
                knots=[0.168063315, 0.168063315, 0.168063315, 1, 1, 1], degree=2, weights=[0.96253587, 0.888541618, 1]))
        make_face()
        with BuildLine():
            add(Edge.make_bspline(
                [(91.535898385, 8), (90.599666447, 9.621601285), (89.99999988, 9.941275628)],
                knots=[0, 0, 0, 0.831887243, 0.831887243, 0.831887243], degree=2, weights=[1, 0.888548242, 0.962527076]))
            ThreePointArc((91.535898385, 8), (91.136296695, 8.96472382), (91, 10))
            Line((91, 10), (89, 10))
            ThreePointArc((89, 10), (88.863703305, 8.96472382), (88.464101615, 8))
            add(Edge.make_bspline(
                [(89.99999988, 9.941275628), (89.400396177, 9.621709752), (88.464101615, 8)],
                knots=[0.168063315, 0.168063315, 0.168063315, 1, 1, 1], degree=2, weights=[0.96253587, 0.888541618, 1]))
        make_face()
        with BuildLine():
            add(Edge.make_bspline(
                [(100, 10), (99.6, 9.973273876), (98.466666667, 8.004449394)],
                knots=[0, 0, 0, 1, 1, 1], degree=2, weights=[1, 0.881917104, 1]))
            Line((100, 10), (99, 10))
            ThreePointArc((99, 10), (98.864367132, 8.967204441), (98.466666667, 8.004449394))
        make_face()
    extrude(amount=FILLET1_DEPTH, mode=Mode.SUBTRACT)

    # Sketch4 → Boss-Extrude3 (add)
    with BuildSketch(Plane.ZY):
        with Locations((47, 7)):
            Rectangle(SKETCH4_W, SKETCH4_H)
    extrude(amount=BOSS_EXTRUDE3_DEPTH)

    # Sketch5 → Boss-Extrude4 (add)
    with BuildSketch(Plane(origin=(100, 0, 0), x_dir=(0, 0, -1), z_dir=(1, 0, 0))):
        with Locations((-47, 7)):
            Rectangle(SKETCH5_W, SKETCH5_H)
    extrude(amount=BOSS_EXTRUDE4_DEPTH)


solid = part.part
